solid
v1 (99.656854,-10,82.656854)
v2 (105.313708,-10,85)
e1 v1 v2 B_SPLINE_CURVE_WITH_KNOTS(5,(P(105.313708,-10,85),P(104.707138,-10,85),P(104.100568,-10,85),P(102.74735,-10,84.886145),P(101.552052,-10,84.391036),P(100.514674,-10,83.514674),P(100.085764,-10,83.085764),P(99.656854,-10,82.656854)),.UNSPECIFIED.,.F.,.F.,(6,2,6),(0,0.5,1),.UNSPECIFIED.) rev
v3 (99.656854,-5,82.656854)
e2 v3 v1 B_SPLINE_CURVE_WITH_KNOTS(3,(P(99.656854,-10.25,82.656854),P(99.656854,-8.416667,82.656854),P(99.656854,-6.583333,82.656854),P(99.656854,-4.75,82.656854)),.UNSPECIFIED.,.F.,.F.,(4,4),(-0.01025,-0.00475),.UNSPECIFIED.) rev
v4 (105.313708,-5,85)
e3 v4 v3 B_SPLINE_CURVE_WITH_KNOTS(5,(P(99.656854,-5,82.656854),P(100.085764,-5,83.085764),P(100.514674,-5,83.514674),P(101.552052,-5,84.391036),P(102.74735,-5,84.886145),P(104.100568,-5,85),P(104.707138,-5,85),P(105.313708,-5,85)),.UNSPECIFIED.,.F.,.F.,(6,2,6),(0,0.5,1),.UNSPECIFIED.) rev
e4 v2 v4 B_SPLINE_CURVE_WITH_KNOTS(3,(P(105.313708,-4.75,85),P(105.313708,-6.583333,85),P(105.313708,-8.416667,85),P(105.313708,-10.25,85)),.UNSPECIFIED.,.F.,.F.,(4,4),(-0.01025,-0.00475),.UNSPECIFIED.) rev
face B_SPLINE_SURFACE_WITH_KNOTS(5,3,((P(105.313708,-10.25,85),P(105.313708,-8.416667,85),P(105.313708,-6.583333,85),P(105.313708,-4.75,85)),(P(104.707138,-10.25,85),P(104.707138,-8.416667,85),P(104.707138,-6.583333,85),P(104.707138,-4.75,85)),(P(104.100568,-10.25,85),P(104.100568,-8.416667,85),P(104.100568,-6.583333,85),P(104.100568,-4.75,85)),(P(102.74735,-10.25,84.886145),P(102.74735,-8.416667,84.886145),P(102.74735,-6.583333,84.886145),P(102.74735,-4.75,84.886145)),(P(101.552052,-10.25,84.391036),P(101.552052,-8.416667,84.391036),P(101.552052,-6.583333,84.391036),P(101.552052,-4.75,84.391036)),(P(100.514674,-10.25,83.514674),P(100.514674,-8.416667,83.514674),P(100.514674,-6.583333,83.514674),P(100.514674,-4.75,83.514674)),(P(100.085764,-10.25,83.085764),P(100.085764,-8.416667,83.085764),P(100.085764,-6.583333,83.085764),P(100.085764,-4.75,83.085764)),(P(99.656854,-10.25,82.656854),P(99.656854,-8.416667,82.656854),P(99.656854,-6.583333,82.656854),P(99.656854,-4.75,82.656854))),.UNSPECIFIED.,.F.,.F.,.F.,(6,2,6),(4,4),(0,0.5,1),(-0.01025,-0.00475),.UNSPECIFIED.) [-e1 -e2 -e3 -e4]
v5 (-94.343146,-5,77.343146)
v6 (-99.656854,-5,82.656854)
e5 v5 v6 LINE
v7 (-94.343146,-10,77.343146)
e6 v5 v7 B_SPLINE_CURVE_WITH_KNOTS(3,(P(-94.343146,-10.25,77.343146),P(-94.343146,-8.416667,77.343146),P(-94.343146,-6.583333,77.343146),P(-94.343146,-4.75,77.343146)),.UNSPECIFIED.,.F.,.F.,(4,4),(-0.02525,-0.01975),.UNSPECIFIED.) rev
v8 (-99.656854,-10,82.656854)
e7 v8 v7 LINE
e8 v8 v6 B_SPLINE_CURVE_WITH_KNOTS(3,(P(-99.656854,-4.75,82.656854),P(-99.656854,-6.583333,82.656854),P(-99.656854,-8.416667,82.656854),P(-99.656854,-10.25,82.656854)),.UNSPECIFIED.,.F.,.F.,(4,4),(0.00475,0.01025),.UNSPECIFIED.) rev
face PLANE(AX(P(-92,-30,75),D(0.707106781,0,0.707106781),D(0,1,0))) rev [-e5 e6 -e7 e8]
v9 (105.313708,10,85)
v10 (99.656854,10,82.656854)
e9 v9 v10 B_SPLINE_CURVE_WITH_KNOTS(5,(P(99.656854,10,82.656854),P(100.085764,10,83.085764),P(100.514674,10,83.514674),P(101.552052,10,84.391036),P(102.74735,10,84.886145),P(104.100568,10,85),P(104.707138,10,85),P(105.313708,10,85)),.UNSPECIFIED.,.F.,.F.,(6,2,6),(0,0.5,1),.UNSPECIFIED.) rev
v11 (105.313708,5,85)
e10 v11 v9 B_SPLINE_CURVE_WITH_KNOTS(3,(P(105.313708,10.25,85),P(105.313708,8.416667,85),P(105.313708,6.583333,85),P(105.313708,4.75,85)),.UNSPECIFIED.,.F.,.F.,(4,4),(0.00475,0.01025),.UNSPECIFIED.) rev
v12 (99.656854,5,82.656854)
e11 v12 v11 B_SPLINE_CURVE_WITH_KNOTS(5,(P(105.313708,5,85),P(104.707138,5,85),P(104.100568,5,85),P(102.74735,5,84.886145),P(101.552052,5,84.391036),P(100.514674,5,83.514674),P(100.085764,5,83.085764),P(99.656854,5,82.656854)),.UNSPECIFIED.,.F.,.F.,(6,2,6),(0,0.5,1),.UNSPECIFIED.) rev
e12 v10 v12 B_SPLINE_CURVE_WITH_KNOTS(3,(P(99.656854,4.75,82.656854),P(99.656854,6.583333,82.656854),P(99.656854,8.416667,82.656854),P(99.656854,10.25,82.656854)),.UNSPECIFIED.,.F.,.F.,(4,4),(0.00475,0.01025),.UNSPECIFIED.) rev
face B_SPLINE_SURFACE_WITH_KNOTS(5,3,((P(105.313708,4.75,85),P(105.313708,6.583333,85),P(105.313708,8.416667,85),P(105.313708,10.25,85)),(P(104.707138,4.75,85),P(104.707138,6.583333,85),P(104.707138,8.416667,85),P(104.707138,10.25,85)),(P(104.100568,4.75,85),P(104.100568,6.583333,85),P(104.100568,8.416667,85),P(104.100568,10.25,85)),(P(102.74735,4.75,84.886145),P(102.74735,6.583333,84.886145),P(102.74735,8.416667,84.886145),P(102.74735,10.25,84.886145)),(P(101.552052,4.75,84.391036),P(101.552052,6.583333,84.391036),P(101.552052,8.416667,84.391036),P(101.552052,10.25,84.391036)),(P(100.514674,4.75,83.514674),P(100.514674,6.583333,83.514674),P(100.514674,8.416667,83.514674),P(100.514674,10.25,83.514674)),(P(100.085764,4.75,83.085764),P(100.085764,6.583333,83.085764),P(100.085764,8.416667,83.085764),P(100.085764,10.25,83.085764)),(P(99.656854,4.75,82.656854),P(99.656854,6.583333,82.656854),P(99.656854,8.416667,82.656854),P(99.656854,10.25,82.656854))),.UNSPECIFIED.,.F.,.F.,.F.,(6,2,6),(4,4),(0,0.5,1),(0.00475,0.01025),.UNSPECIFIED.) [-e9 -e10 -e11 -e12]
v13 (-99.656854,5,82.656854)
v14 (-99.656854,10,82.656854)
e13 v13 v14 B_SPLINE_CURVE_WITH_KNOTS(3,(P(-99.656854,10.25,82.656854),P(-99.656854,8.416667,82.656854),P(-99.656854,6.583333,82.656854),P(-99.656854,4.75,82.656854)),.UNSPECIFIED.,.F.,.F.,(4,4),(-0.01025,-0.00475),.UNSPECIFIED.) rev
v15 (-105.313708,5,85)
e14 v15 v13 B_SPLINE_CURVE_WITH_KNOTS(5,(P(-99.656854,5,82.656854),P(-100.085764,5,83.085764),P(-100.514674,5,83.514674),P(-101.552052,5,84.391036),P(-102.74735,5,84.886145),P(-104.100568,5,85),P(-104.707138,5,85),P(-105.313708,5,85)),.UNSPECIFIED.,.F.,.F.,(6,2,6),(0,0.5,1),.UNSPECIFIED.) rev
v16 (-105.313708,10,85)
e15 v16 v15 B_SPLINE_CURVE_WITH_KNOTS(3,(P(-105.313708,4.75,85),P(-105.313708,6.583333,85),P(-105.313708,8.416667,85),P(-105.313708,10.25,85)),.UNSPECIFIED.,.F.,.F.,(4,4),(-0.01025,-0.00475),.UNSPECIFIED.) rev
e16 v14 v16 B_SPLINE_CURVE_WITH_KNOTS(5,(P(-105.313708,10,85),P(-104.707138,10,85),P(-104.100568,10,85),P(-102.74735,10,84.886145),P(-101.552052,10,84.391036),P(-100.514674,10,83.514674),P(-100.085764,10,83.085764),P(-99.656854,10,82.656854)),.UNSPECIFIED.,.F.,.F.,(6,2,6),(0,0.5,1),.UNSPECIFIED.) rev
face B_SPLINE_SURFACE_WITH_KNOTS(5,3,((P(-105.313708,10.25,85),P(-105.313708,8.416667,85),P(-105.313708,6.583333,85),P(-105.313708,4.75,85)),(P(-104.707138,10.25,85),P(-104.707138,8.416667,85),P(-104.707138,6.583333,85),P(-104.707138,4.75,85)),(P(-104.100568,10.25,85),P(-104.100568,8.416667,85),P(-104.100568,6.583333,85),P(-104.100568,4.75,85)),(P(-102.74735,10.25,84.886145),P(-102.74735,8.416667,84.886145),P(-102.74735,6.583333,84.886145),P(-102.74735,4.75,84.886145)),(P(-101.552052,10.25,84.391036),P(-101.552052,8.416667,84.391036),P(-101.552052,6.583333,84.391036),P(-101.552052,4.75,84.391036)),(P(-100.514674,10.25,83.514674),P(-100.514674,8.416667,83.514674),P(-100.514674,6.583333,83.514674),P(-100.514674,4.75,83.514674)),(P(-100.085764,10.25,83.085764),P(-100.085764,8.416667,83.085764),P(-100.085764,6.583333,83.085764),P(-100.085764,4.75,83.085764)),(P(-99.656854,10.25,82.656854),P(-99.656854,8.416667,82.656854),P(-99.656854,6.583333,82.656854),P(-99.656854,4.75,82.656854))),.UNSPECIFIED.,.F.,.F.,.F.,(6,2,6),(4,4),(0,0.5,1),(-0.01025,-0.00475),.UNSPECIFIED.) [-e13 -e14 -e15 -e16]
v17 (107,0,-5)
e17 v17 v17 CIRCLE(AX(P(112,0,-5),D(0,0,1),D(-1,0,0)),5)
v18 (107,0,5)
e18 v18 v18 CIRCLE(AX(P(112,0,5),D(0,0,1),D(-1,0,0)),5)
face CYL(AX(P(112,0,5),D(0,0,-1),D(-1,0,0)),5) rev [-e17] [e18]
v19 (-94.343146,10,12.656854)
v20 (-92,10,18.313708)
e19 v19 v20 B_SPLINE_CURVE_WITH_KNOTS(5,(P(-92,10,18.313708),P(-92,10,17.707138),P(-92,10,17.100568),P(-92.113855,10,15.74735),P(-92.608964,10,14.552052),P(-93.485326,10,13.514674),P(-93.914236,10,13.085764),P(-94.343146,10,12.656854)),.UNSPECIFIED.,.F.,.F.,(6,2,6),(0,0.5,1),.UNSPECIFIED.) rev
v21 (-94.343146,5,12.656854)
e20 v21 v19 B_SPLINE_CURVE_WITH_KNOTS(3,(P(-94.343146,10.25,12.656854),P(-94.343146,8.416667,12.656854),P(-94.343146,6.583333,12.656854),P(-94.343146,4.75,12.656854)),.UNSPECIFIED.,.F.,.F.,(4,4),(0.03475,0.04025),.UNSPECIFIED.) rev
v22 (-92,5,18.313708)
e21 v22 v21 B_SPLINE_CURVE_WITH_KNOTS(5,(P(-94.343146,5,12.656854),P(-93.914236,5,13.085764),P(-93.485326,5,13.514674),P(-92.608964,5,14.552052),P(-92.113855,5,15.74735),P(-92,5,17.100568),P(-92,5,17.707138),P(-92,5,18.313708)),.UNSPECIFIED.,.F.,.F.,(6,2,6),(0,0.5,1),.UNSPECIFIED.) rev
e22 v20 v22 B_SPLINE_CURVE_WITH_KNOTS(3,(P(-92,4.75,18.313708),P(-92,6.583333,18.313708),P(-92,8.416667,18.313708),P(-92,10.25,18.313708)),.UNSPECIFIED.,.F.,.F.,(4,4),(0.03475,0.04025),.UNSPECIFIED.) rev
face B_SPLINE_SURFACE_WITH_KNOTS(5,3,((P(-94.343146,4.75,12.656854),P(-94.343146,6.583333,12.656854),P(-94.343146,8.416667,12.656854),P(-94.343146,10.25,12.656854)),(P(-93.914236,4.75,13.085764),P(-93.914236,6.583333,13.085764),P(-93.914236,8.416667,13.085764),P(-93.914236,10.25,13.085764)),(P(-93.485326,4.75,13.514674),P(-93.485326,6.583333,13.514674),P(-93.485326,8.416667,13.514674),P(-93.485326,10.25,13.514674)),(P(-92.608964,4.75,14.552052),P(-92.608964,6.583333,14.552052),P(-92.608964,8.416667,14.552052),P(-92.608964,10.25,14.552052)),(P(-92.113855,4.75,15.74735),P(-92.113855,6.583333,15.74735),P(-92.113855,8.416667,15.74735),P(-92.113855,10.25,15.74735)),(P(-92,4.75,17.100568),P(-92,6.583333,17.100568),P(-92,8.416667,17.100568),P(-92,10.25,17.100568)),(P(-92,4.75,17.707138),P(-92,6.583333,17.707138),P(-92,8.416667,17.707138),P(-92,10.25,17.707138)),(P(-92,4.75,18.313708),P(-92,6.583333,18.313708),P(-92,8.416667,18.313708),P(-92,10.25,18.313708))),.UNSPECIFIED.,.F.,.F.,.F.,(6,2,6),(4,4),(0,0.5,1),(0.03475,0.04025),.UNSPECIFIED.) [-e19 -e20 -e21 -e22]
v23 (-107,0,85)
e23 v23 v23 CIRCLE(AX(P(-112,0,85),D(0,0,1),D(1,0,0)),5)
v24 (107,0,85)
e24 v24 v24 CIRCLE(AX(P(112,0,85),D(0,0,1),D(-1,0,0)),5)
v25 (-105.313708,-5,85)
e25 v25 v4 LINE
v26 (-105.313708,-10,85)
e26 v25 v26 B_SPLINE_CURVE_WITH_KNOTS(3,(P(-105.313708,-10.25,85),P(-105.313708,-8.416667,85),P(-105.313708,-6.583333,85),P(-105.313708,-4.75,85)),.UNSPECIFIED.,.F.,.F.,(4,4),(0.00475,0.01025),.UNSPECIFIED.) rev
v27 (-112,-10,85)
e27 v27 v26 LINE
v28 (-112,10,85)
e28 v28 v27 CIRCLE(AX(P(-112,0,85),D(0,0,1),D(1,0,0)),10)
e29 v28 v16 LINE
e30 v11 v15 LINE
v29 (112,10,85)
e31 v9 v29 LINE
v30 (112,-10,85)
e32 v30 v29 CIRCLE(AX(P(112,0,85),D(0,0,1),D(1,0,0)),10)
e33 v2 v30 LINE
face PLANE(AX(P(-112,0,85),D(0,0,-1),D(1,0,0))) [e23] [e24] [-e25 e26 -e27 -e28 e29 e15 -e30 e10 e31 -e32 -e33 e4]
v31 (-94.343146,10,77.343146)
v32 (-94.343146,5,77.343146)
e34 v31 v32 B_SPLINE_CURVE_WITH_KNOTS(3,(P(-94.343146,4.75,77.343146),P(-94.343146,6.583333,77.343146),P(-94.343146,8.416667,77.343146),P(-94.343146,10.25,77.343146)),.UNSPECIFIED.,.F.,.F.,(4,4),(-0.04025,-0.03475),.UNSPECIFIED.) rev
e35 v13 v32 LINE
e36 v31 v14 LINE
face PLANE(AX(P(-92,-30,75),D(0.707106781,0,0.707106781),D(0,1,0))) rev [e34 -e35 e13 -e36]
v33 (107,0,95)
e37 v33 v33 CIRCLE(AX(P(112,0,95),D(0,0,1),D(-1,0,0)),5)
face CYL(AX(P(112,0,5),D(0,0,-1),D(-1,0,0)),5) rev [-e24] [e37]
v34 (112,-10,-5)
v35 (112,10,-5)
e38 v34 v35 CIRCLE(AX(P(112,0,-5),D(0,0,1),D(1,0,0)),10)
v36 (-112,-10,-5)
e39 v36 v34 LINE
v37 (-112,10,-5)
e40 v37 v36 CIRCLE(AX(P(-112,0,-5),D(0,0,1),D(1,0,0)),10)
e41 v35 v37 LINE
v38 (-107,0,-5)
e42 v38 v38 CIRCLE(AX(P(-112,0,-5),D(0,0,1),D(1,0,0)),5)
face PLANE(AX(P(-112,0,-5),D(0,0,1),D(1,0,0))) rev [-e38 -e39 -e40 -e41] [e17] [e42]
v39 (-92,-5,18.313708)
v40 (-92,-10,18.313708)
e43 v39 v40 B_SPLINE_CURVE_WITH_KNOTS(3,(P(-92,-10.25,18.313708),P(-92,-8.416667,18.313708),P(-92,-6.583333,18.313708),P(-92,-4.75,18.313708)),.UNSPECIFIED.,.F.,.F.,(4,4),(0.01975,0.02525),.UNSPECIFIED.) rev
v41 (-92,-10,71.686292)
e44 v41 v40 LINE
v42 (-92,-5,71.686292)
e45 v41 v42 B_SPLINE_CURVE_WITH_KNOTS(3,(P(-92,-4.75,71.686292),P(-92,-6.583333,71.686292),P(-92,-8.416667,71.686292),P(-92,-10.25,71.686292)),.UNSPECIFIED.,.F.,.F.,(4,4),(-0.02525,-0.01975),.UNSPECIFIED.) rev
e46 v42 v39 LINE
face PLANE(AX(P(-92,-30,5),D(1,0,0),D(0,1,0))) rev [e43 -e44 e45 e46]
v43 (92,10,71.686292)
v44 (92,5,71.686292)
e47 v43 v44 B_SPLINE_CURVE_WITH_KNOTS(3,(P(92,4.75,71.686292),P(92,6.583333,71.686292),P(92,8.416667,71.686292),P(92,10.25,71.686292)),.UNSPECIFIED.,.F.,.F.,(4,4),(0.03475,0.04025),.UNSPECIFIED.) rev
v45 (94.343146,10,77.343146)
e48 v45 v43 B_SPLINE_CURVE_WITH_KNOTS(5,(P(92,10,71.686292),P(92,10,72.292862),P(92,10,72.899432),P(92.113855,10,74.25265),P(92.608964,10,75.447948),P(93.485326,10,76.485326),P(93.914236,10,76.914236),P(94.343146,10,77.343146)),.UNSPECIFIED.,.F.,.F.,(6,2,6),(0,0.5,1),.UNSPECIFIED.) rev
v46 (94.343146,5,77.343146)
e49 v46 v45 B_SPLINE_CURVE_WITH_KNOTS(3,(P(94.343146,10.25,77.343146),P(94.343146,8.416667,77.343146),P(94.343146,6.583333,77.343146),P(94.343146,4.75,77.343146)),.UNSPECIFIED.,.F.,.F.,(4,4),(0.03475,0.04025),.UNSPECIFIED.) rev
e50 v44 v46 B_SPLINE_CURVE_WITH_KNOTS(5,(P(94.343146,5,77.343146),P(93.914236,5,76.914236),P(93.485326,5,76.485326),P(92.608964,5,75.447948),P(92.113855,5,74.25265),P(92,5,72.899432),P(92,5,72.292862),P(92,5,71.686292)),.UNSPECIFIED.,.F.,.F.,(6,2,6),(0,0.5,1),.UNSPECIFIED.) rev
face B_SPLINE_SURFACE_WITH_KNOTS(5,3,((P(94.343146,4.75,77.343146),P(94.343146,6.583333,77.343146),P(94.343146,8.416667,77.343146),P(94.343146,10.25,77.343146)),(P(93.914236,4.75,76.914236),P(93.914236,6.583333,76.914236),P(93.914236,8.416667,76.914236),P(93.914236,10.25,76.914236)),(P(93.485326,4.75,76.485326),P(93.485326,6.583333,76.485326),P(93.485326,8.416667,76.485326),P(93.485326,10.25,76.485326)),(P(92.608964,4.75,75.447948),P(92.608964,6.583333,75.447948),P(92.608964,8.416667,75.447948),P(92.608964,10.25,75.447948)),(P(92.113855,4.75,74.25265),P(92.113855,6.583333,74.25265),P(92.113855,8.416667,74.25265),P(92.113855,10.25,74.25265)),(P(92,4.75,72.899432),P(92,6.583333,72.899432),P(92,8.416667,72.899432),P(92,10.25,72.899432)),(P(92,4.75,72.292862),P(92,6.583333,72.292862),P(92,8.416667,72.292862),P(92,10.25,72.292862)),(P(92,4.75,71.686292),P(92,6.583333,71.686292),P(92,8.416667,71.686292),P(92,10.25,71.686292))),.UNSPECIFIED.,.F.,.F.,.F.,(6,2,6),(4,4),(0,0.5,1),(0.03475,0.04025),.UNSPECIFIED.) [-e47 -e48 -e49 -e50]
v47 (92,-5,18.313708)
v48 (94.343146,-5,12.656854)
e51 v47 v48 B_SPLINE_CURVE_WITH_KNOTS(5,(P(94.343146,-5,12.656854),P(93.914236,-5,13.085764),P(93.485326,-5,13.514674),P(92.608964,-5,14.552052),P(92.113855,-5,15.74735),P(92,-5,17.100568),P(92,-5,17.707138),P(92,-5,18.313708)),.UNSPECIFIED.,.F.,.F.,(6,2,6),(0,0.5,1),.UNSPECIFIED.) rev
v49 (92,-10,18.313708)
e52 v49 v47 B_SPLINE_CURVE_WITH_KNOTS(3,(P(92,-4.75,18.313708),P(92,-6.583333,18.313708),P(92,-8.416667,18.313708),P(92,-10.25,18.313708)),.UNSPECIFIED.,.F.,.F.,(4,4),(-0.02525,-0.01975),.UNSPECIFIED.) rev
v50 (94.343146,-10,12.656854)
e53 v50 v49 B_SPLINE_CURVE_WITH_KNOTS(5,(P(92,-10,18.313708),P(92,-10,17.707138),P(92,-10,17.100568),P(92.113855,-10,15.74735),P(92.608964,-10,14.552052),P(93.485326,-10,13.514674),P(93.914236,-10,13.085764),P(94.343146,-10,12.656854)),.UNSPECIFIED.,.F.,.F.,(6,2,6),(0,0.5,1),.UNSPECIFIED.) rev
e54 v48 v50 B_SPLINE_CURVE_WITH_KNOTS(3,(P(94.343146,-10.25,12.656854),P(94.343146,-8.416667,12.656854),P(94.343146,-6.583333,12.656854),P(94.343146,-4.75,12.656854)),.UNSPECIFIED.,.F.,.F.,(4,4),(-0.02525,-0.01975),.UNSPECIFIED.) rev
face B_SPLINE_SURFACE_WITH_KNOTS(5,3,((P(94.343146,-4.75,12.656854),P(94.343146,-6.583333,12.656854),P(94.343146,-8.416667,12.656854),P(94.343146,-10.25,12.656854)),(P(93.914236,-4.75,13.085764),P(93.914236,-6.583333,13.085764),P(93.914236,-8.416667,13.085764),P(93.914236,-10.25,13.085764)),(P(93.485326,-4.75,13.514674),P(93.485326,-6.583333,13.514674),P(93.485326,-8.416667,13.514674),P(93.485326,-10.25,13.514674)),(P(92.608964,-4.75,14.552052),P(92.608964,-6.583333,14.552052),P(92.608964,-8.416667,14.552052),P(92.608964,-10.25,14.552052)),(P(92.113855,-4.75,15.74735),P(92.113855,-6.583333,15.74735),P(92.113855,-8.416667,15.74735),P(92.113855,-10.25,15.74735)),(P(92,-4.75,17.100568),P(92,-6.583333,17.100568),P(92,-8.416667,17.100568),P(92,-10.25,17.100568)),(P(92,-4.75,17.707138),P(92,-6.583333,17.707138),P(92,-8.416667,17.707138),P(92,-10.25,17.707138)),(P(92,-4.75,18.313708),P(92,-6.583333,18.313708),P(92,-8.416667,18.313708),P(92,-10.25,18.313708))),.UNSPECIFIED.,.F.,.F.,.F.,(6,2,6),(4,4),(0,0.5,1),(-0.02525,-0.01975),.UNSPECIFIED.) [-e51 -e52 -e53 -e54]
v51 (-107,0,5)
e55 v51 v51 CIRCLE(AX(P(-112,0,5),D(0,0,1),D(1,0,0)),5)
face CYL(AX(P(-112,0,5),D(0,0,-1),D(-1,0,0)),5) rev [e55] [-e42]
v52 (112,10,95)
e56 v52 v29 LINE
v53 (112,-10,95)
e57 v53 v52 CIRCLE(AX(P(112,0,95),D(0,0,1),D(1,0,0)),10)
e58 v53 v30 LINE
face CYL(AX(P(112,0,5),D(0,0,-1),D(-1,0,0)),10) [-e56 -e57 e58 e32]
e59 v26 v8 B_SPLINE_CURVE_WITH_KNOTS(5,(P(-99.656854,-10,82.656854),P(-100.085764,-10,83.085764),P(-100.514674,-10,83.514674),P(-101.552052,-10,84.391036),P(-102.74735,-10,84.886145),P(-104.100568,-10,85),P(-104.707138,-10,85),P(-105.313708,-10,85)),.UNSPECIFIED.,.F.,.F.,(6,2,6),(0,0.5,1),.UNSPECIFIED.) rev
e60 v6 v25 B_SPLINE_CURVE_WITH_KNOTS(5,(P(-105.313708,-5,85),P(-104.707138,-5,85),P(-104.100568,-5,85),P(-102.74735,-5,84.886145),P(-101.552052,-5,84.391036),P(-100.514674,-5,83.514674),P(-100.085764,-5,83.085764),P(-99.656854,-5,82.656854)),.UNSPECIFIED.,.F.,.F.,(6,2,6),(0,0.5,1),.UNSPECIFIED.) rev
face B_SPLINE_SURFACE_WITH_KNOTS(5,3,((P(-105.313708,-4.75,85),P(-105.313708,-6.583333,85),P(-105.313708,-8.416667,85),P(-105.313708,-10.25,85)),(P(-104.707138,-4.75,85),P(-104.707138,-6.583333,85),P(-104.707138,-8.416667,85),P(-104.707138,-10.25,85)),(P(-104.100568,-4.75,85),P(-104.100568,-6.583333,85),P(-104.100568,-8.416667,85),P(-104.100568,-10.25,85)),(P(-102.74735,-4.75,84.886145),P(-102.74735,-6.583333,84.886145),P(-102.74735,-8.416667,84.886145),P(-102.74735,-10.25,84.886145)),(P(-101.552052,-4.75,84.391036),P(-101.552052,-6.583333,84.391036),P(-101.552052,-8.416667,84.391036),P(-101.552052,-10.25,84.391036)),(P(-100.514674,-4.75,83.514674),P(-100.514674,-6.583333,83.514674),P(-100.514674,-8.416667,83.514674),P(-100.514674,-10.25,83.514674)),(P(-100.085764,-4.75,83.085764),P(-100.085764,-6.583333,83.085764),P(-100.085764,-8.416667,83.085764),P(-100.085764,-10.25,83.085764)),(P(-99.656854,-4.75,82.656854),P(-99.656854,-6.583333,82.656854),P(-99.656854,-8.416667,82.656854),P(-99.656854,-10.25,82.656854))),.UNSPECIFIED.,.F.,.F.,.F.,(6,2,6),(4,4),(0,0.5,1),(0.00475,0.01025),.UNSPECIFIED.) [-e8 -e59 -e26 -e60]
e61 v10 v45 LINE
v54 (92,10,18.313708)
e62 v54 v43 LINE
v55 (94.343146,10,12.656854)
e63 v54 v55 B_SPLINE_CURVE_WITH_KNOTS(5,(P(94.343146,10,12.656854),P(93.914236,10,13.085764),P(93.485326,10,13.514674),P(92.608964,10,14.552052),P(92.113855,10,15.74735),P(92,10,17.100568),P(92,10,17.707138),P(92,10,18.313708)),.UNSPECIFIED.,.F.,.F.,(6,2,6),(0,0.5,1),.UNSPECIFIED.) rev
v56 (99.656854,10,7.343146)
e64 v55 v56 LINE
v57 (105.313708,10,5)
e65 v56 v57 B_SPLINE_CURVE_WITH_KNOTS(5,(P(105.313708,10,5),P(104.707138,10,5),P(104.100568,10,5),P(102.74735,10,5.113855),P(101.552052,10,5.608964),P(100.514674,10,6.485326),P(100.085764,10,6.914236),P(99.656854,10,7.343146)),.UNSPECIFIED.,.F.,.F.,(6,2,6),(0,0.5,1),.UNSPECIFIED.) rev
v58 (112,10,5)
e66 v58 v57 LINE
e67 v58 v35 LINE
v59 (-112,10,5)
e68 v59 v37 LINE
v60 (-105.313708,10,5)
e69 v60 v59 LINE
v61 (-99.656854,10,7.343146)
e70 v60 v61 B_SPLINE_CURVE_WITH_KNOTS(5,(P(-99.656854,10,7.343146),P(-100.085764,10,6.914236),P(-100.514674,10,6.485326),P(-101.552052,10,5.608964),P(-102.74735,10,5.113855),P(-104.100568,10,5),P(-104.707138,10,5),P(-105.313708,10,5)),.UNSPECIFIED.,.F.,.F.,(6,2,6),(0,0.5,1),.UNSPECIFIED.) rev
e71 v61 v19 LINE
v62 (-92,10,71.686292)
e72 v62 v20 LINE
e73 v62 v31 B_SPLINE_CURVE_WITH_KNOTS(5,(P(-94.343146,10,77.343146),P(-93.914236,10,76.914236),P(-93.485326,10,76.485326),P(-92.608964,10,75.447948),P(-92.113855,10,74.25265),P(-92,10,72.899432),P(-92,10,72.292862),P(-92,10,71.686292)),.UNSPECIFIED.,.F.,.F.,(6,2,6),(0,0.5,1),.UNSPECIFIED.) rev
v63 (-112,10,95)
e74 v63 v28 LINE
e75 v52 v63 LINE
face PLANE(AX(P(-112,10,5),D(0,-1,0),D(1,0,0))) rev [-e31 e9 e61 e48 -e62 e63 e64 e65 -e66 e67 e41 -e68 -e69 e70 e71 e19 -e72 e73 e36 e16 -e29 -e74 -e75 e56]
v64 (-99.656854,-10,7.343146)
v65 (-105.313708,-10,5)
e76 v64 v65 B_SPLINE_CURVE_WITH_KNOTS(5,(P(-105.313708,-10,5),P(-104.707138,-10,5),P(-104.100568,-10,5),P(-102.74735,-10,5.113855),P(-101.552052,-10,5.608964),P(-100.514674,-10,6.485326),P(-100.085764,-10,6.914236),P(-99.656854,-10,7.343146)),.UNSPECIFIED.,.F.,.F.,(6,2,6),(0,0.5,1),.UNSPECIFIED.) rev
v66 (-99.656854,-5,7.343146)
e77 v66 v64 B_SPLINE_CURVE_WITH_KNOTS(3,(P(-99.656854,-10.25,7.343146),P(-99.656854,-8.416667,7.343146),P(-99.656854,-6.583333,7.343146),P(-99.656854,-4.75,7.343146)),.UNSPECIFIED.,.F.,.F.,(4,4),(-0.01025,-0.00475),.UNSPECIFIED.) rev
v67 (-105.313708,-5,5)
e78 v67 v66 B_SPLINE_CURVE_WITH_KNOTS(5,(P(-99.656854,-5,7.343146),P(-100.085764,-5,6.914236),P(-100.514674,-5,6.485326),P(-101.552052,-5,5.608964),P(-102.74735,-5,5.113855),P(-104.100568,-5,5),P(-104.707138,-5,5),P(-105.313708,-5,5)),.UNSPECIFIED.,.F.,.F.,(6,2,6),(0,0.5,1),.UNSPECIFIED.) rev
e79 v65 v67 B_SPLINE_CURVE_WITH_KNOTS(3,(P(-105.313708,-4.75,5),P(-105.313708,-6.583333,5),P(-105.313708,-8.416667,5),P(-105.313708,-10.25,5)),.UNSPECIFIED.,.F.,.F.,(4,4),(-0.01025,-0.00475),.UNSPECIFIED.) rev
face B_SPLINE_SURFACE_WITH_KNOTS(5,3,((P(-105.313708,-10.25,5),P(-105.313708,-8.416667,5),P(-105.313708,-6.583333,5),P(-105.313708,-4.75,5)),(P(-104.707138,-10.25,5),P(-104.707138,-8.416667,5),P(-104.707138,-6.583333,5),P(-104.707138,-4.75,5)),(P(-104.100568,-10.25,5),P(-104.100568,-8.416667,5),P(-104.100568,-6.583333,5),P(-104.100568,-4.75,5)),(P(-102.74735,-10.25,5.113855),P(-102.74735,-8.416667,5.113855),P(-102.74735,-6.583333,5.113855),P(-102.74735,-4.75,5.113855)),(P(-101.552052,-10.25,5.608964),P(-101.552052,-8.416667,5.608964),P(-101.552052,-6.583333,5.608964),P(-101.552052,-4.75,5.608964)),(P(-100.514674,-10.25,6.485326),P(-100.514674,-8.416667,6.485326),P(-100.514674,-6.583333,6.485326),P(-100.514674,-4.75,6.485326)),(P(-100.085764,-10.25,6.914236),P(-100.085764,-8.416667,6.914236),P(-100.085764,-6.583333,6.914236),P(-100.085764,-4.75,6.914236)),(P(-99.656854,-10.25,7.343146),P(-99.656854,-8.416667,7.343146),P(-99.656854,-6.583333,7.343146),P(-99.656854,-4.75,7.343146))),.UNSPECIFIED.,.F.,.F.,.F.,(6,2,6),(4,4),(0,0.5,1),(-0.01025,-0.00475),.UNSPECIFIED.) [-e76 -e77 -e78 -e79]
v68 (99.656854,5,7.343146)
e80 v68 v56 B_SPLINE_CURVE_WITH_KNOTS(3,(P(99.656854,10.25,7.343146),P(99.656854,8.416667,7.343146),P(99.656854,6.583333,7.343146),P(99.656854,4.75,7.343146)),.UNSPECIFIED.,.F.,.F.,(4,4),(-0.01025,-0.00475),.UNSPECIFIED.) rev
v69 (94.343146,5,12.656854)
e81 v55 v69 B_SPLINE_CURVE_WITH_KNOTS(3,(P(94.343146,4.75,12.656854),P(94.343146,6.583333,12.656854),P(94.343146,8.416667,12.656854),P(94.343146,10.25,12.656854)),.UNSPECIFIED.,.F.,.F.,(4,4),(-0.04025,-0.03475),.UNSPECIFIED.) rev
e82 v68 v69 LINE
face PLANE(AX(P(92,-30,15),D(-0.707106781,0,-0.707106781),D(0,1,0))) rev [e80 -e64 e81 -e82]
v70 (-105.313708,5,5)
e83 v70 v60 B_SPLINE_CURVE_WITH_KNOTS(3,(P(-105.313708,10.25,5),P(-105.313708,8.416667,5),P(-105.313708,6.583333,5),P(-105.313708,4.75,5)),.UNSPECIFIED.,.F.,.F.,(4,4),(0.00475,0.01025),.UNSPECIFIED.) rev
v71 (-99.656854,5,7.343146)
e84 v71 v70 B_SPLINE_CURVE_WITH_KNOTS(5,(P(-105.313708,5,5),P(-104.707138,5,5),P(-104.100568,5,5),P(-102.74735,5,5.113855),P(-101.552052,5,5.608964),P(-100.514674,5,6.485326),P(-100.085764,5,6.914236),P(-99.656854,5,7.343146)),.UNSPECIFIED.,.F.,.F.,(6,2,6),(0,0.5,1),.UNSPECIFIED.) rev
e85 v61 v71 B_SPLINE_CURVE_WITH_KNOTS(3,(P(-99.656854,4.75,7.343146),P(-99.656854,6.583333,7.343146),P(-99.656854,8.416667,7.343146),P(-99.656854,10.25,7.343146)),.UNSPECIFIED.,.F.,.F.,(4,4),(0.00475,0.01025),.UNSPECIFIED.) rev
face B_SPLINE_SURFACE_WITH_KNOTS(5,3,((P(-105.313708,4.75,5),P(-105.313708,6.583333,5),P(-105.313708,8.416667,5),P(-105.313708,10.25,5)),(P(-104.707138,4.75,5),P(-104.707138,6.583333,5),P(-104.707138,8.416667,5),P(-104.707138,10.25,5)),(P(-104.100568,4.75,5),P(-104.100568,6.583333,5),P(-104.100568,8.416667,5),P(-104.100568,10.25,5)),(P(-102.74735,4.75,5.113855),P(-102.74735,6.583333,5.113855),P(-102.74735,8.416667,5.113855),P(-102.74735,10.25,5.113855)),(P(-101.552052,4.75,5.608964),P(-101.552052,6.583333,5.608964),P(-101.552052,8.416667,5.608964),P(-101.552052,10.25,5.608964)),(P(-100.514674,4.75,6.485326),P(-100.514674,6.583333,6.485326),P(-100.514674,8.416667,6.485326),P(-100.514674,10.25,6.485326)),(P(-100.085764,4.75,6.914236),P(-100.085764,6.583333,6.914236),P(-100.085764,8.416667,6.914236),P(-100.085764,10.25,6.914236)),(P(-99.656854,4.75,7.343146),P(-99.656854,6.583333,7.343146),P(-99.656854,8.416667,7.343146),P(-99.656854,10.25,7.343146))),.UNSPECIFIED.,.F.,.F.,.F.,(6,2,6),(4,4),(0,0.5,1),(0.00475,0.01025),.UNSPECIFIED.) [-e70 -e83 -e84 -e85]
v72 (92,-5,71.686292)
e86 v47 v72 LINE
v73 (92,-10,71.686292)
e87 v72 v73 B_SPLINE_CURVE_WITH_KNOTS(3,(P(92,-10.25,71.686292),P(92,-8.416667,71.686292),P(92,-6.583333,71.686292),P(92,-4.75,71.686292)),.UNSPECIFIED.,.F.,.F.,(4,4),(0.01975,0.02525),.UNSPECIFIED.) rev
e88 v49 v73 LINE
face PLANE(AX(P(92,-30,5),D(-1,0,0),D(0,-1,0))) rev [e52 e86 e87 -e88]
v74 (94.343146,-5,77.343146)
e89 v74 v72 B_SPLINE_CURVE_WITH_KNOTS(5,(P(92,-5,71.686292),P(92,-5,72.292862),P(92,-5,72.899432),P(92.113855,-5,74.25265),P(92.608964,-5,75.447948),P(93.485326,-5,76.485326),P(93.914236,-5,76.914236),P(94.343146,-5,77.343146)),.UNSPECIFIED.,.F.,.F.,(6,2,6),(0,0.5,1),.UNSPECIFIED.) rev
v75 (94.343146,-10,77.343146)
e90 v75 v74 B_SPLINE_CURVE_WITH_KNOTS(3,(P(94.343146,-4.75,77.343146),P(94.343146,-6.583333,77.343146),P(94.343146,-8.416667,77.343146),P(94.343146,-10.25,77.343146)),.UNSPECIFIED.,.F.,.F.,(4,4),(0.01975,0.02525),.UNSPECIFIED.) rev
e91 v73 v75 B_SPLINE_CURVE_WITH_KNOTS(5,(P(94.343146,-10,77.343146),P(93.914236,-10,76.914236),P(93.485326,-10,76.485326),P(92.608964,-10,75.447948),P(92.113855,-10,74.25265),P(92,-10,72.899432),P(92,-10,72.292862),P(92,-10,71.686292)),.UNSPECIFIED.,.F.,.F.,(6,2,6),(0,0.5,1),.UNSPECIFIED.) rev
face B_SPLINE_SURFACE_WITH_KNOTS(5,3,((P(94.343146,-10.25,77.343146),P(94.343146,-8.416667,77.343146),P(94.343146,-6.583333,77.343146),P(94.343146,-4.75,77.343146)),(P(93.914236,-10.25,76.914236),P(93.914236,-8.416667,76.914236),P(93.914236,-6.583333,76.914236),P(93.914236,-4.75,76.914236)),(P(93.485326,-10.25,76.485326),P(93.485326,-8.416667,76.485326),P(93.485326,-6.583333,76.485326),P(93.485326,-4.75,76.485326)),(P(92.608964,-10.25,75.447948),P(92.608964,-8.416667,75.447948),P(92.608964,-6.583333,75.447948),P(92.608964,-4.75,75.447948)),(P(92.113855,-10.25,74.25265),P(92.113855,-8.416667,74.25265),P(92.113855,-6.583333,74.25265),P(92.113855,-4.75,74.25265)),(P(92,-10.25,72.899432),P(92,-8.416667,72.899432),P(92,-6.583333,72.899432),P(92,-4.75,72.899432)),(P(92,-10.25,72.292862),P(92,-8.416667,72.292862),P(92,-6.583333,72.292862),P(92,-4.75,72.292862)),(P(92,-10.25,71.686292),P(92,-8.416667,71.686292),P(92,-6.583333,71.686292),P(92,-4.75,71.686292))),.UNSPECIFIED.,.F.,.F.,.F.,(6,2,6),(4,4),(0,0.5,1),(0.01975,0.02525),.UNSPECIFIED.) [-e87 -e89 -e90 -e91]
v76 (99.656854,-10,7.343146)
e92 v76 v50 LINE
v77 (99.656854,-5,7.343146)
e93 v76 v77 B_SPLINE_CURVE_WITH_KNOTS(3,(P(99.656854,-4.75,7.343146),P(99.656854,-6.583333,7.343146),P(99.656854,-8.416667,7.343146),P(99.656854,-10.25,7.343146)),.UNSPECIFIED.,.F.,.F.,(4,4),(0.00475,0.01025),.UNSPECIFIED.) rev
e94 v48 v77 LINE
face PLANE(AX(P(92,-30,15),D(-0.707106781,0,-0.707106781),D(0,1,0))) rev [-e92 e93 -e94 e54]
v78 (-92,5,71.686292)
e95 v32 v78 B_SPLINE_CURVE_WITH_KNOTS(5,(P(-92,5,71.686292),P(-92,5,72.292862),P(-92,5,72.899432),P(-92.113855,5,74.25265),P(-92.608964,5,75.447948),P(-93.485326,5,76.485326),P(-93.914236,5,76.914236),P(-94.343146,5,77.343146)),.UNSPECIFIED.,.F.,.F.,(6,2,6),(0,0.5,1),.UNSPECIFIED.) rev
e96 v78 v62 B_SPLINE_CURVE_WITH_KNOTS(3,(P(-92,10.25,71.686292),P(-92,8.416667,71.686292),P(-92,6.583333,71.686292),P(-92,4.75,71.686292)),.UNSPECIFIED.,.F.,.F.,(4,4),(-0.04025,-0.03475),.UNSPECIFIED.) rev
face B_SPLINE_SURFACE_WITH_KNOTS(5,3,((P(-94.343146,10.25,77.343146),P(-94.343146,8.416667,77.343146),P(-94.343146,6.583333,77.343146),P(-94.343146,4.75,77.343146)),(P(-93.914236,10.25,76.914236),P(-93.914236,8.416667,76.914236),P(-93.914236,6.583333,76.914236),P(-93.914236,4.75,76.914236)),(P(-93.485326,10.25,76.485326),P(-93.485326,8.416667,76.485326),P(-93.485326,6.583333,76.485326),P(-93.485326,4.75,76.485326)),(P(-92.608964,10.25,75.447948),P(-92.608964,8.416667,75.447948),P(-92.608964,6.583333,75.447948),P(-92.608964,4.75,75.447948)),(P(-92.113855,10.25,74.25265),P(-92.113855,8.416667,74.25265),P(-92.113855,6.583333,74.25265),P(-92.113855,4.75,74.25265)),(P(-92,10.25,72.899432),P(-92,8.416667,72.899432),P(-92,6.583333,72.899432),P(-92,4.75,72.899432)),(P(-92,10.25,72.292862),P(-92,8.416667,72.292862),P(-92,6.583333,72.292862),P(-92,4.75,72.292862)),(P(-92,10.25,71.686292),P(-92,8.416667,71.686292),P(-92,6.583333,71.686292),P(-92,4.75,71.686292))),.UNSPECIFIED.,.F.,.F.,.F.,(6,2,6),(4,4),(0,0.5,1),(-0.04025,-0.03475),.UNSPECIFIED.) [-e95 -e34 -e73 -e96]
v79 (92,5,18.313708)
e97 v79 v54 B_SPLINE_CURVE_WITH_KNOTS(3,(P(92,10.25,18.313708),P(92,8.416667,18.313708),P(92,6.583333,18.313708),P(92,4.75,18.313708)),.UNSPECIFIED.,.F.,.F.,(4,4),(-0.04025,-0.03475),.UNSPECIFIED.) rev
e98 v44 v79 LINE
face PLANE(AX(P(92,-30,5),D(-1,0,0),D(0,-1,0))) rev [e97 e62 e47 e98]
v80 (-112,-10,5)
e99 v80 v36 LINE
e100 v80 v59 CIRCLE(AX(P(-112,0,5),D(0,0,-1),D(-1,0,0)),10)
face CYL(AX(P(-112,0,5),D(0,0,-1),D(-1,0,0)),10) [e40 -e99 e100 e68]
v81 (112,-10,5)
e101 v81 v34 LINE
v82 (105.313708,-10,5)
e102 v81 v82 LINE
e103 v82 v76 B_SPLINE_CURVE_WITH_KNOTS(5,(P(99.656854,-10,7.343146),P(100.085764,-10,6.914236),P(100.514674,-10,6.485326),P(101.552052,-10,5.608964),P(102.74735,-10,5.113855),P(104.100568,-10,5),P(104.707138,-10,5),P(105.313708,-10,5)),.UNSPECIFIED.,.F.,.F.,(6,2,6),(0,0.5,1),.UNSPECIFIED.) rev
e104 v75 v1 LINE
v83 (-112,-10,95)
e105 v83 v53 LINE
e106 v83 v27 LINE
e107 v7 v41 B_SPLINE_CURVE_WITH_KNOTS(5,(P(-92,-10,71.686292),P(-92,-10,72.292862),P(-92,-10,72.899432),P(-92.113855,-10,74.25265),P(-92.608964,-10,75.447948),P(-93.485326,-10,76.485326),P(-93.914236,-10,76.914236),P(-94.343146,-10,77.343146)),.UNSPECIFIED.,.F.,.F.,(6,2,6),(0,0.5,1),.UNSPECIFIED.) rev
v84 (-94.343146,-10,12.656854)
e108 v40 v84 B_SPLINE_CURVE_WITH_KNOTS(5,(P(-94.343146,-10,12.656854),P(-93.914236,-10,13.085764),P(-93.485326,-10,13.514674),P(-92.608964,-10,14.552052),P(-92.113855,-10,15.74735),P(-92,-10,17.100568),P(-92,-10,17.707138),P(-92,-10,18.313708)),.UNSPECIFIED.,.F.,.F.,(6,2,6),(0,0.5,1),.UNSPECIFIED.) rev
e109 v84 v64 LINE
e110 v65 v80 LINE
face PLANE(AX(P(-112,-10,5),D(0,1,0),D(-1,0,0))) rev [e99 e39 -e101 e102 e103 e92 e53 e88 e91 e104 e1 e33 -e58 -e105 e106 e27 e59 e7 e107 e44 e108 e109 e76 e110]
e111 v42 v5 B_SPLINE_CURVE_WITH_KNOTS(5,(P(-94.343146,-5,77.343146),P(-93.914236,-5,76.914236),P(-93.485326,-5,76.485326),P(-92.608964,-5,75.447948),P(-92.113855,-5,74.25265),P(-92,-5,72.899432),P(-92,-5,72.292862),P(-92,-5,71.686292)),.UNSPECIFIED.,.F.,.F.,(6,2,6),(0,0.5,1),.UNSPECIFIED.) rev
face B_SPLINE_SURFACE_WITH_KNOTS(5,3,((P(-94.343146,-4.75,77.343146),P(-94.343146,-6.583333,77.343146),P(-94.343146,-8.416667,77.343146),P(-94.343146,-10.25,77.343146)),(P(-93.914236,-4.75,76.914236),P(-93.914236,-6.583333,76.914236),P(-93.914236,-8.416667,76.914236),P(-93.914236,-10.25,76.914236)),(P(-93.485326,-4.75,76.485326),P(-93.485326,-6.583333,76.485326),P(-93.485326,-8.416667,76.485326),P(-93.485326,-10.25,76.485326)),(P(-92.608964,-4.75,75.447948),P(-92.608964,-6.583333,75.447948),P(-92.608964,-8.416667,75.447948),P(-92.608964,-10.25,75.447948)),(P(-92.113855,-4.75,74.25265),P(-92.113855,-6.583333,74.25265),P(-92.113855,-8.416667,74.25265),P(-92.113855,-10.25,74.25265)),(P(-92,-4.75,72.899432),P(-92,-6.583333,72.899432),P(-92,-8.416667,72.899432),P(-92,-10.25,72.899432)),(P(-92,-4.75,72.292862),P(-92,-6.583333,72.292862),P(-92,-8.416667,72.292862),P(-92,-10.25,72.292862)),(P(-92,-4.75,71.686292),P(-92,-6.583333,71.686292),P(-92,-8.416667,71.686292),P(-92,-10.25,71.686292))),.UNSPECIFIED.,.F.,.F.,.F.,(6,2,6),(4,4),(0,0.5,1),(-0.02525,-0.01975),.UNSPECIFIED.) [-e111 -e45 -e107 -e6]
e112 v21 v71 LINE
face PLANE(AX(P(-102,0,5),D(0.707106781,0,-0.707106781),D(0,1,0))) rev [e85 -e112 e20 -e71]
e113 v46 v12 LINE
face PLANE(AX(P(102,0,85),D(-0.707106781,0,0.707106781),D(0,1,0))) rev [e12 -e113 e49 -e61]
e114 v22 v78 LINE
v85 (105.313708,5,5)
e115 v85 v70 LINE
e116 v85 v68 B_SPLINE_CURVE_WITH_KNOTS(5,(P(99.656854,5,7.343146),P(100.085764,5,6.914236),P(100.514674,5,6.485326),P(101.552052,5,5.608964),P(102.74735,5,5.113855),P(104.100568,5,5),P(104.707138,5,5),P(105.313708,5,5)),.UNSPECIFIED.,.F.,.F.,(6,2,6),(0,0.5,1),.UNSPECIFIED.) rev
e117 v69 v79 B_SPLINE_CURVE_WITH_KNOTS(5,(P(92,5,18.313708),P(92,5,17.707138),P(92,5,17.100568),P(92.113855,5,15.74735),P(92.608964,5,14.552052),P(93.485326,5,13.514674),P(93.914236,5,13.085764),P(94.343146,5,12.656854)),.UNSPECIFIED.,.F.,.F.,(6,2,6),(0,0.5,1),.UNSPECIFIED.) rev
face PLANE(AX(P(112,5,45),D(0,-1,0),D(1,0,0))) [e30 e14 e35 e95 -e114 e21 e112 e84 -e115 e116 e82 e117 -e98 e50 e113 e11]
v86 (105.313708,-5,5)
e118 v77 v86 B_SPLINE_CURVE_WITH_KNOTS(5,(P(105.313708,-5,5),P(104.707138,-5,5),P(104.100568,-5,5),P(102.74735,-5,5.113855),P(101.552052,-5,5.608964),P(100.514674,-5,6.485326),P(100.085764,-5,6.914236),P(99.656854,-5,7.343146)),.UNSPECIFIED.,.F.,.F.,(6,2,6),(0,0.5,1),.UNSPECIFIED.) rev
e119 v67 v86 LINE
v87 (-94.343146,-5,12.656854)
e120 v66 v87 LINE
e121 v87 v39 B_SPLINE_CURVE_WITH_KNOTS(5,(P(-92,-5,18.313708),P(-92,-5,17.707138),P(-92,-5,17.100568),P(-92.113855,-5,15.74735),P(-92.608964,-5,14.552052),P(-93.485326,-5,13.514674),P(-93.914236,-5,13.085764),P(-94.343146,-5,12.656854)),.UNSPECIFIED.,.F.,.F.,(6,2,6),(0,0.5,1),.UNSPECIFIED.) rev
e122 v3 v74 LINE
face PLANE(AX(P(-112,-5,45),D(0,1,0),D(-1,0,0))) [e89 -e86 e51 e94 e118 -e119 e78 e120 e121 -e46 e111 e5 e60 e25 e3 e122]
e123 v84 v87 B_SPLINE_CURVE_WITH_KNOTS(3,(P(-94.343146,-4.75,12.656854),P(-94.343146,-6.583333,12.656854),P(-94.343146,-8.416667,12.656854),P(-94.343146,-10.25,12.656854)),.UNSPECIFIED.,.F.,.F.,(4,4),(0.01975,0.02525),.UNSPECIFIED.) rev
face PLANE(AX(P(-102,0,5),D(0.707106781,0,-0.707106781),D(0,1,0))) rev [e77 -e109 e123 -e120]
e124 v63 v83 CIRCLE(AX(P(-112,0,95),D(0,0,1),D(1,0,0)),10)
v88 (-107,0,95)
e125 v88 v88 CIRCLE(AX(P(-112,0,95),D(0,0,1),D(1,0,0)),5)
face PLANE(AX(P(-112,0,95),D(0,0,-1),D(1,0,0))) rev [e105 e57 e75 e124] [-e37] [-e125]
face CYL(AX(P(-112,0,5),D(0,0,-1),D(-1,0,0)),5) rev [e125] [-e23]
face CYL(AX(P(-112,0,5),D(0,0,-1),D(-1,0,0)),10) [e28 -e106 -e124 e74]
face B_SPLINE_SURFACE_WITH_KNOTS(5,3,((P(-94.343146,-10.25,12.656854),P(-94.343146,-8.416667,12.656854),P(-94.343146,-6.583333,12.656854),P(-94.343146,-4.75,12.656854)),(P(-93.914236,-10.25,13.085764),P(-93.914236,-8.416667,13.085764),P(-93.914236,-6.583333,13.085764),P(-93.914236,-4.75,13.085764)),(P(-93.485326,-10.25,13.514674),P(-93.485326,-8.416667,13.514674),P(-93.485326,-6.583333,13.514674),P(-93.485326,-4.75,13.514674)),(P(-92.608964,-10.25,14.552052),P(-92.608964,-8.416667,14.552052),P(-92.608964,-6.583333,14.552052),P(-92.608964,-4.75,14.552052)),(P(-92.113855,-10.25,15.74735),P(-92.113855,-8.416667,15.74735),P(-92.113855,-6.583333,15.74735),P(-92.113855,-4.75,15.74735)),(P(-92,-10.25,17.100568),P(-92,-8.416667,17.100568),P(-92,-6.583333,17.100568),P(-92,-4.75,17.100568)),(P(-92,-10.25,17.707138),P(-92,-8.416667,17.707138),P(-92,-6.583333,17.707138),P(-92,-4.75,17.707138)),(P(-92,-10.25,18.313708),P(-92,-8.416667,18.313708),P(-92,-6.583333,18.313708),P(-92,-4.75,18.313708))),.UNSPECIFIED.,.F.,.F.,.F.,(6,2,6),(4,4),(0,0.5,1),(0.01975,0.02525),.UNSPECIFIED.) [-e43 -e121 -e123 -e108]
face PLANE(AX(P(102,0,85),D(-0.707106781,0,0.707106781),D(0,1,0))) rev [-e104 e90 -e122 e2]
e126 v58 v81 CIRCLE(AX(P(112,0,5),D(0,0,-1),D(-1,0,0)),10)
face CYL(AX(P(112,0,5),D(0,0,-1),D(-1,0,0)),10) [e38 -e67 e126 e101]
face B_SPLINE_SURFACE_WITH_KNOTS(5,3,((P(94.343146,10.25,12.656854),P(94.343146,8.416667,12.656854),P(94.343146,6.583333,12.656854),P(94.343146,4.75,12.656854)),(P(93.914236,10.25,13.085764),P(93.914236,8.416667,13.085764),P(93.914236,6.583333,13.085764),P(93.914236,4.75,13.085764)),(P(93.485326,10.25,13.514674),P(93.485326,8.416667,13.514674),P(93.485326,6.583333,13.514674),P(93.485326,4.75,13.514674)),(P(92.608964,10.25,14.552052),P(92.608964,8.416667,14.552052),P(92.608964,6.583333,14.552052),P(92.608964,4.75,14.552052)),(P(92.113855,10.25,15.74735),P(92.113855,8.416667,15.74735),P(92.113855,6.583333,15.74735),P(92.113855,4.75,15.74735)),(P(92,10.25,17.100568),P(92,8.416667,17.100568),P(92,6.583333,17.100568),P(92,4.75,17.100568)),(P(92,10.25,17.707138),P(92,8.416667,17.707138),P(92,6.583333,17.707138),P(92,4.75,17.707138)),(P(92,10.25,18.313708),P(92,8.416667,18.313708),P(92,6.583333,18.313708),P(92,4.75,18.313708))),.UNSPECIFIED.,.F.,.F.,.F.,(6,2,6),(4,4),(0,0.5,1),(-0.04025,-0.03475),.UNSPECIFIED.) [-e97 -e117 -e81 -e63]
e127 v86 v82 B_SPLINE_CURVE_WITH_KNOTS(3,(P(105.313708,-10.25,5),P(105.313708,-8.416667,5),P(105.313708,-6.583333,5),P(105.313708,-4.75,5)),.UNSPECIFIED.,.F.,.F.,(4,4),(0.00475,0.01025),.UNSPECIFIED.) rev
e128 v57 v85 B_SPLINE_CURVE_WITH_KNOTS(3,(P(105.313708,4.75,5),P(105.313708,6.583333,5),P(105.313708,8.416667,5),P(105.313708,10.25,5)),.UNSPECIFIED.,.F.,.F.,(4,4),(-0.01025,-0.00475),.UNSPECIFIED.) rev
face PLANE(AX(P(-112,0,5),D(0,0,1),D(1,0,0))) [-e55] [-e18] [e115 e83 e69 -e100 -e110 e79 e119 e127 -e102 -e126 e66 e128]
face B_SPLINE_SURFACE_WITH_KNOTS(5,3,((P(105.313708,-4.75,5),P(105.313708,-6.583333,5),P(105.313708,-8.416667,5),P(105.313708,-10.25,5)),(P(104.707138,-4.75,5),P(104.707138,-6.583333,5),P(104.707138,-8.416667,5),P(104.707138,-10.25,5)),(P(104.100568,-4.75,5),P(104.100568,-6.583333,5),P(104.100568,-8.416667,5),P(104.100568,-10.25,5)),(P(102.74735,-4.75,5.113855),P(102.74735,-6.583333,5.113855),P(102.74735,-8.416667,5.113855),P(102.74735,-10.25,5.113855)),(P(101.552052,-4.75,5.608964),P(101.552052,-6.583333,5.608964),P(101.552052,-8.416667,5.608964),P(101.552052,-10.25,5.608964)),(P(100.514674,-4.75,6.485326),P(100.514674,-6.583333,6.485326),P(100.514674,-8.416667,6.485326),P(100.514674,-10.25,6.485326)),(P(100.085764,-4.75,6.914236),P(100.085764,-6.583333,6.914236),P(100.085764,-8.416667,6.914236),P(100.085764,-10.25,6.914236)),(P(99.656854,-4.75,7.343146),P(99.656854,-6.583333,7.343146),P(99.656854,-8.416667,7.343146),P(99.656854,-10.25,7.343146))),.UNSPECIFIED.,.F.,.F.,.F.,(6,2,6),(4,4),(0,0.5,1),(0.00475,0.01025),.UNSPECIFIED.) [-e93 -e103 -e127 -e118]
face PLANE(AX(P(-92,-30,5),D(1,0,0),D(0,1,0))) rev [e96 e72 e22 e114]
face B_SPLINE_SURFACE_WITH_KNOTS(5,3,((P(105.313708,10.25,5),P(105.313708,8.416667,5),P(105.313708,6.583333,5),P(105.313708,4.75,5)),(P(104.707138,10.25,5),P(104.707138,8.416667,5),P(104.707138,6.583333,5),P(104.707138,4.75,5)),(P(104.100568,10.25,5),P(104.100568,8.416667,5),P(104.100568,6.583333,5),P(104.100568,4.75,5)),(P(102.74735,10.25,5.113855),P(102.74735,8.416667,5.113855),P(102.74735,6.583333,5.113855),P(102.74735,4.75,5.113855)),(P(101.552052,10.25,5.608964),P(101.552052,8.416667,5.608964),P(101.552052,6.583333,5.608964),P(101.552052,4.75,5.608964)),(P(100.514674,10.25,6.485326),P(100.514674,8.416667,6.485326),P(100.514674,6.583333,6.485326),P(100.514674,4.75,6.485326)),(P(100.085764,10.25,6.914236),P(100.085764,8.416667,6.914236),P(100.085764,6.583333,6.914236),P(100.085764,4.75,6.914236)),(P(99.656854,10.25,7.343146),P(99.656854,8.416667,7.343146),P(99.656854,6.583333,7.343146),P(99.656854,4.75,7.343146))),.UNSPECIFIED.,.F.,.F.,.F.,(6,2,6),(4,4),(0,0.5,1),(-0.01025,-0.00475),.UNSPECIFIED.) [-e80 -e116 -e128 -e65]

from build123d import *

# Parameters (mm, degrees)
SKETCH1_R           = 5
BOSS_EXTRUDE1_DEPTH = 5
BOSS_EXTRUDE2_DEPTH = 40
SKETCH4_W           = 48.223256465
SKETCH4_H           = 80
CUT_EXTRUDE1_DEPTH  = 40
CHAMFER1_SIZE       = 10


with BuildPart() as part:
    # Sketch1 → Boss-Extrude1 (new, symmetric)
    with BuildSketch(Plane.XY):
        with BuildLine():
            Line((-112, 10), (112, 10))
            ThreePointArc((112, 10), (122, 0), (112, -10))
            Line((112, -10), (-112, -10))
            ThreePointArc((-112, -10), (-122, 0), (-112, 10))
        make_face()
        with Locations((-112, 0)):
            Circle(SKETCH1_R, mode=Mode.SUBTRACT)
        with Locations(Location((112, 0, 0), (0, 0, 180))):
            Circle(SKETCH1_R, mode=Mode.SUBTRACT)
    extrude(amount=BOSS_EXTRUDE1_DEPTH, both=True)

    # Sketch2 → Boss-Extrude2 (add)
    with BuildSketch(Plane.XY.offset(5)):
        with BuildLine():
            Line((-112, -10), (112, -10))
            ThreePointArc((112, -10), (122, 0), (112, 10))
            Line((112, 10), (-112, 10))
            ThreePointArc((-112, 10), (-122, 0), (-112, -10))
        make_face()
        with BuildLine():
            Line((-112, -5), (112, -5))
            ThreePointArc((112, -5), (117, 0), (112, 5))
            Line((112, 5), (-112, 5))
            ThreePointArc((-112, 5), (-117, 0), (-112, -5))
        make_face(mode=Mode.SUBTRACT)
    extrude(amount=BOSS_EXTRUDE2_DEPTH)

    # Mirror1: part across plane


with BuildPart() as part_1:
    add(part.part)
    add(part.part.mirror(Plane(origin=(-112, 0, 45), x_dir=(1, 0, 0), z_dir=(0, 0, 1))))

    # Sketch4 → Cut-Extrude1 (cut)
    with BuildSketch(Plane(origin=(0, 10, 0), x_dir=(1, 0, 0), z_dir=(0, 1, 0))):
        with Locations((-116.111628233, -45)):
            Rectangle(SKETCH4_W, SKETCH4_H)
        with Locations((116.111628233, -45)):
            Rectangle(SKETCH4_W, SKETCH4_H)
    extrude(amount=-CUT_EXTRUDE1_DEPTH, mode=Mode.SUBTRACT)

    # Chamfer1
    chamfer1_edges = [part_1.edges().sort_by_distance(p)[0] for p in [
        (-92, 7.5, 5),
        (92, -7.5, 5),
        (92, 7.5, 5),
        (92, -7.5, 85),
        (92, 7.5, 85),
        (-92, -7.5, 85),
        (-92, 7.5, 85),
        (-92, -7.5, 5),
    ]]
    chamfer(chamfer1_edges, length=CHAMFER1_SIZE)

    # Fillet1
    # a fillet whose section is not a circle: 8 mm, written as the material it adds along each edge (its section moved 0.00015 mm through the faces so that the kernel can cut it)
    with BuildSketch(Plane(origin=(-92, -5, 15), x_dir=(4.5266504249621425e-05, 0, 0.9999999989754718), z_dir=(0, -1, 0)), Plane(origin=(-102, -5, 5), x_dir=(0.7071387887142107, 0, 0.7070747722099827), z_dir=(0, -1, 0)), Plane(origin=(-92, -5, 75), x_dir=(-0.707074772209981, 0, 0.7071387887142122), z_dir=(0, -1, 0)), Plane(origin=(-92, 10, 75), x_dir=(-0.707074772209981, 0, 0.7071387887142122), z_dir=(0, -1, 0)), Plane(origin=(102, 10, 85), x_dir=(-0.7071387887142122, 0, -0.707074772209981), z_dir=(0, -1, 0)), Plane(origin=(-102, 10, 5), x_dir=(0.7071387887142107, 0, 0.7070747722099827), z_dir=(0, -1, 0)), Plane(origin=(-92, 10, 15), x_dir=(4.5266504249621425e-05, 0, 0.9999999989754718), z_dir=(0, -1, 0))) as fillet1_piece_1:
        with BuildLine():
            add(Edge.make_bspline([(3.313708502, 0), (2.707126731, -2.7458e-05), (2.10054496, -5.4916e-05), (0.747296328, 0.113741147), (-0.448046284, 0.608804877), (-1.485482876, 1.485136275), (-1.914420376, 1.914034943), (-2.343357875, 2.342933611)], knots=[0, 0, 0, 0, 0, 0, 0.5, 0.5, 1, 1, 1, 1, 1, 1], degree=5))
            Line((-2.343357875, 2.342933611), (-2.456489839, 2.229791405))
            ThreePointArc((-2.456489839, 2.229791405), (-1.284757871, 1.058377635), (-0.113131964, -0.113142206))
            Line((-0.113131964, -0.113142206), (7.243e-06, -0.16))
            ThreePointArc((7.243e-06, -0.16), (1.65686149, -0.159925), (3.313715745, -0.16))
            Line((3.313715745, -0.16), (3.313708502, 0))
        make_face()
    extrude(amount=5)
    with BuildSketch(Plane(origin=(92, -5, 15), x_dir=(-4.526650424962133e-05, 0, 0.9999999989754718), z_dir=(0, -1, 0)), Plane(origin=(92, -5, 75), x_dir=(0.707074772209981, 0, 0.7071387887142122), z_dir=(0, -1, 0)), Plane(origin=(102, -5, 85), x_dir=(0.9999999989754718, 0, 4.526650424962133e-05), z_dir=(0, -1, 0)), Plane(origin=(-102, -5, 85), x_dir=(0.7071387887142122, 0, -0.707074772209981), z_dir=(0, -1, 0)), Plane(origin=(102, -5, 5), x_dir=(-0.7071387887142124, 0, 0.7070747722099809), z_dir=(0, -1, 0)), Plane(origin=(-102, 10, 85), x_dir=(0.7071387887142122, 0, -0.707074772209981), z_dir=(0, -1, 0)), Plane(origin=(92, 10, 75), x_dir=(0.707074772209981, 0, 0.7071387887142122), z_dir=(0, -1, 0)), Plane(origin=(92, 10, 15), x_dir=(-4.526650424962133e-05, 0, 0.9999999989754718), z_dir=(0, -1, 0)), Plane(origin=(102, 10, 5), x_dir=(-0.7071387887142124, 0, 0.7070747722099809), z_dir=(0, -1, 0))) as fillet1_piece_2:
        with BuildLine():
            add(Edge.make_bspline([(3.313708502, 0), (2.707126731, 2.7458e-05), (2.10054496, 5.4916e-05), (0.747296328, -0.113741147), (-0.448046284, -0.608804877), (-1.485482876, -1.485136275), (-1.914420376, -1.914034943), (-2.343357875, -2.342933611)], knots=[0, 0, 0, 0, 0, 0, 0.5, 0.5, 1, 1, 1, 1, 1, 1], degree=5))
            Line((-2.343357875, -2.342933611), (-2.456489839, -2.229791405))
            ThreePointArc((-2.456489839, -2.229791405), (-1.284757871, -1.058377635), (-0.113131964, 0.113142206))
            Line((-0.113131964, 0.113142206), (7.243e-06, 0.16))
            ThreePointArc((7.243e-06, 0.16), (1.65686149, 0.159925), (3.313715745, 0.16))
            Line((3.313715745, 0.16), (3.313708502, 0))
        make_face()
    extrude(amount=5)


solid = part_1.part
